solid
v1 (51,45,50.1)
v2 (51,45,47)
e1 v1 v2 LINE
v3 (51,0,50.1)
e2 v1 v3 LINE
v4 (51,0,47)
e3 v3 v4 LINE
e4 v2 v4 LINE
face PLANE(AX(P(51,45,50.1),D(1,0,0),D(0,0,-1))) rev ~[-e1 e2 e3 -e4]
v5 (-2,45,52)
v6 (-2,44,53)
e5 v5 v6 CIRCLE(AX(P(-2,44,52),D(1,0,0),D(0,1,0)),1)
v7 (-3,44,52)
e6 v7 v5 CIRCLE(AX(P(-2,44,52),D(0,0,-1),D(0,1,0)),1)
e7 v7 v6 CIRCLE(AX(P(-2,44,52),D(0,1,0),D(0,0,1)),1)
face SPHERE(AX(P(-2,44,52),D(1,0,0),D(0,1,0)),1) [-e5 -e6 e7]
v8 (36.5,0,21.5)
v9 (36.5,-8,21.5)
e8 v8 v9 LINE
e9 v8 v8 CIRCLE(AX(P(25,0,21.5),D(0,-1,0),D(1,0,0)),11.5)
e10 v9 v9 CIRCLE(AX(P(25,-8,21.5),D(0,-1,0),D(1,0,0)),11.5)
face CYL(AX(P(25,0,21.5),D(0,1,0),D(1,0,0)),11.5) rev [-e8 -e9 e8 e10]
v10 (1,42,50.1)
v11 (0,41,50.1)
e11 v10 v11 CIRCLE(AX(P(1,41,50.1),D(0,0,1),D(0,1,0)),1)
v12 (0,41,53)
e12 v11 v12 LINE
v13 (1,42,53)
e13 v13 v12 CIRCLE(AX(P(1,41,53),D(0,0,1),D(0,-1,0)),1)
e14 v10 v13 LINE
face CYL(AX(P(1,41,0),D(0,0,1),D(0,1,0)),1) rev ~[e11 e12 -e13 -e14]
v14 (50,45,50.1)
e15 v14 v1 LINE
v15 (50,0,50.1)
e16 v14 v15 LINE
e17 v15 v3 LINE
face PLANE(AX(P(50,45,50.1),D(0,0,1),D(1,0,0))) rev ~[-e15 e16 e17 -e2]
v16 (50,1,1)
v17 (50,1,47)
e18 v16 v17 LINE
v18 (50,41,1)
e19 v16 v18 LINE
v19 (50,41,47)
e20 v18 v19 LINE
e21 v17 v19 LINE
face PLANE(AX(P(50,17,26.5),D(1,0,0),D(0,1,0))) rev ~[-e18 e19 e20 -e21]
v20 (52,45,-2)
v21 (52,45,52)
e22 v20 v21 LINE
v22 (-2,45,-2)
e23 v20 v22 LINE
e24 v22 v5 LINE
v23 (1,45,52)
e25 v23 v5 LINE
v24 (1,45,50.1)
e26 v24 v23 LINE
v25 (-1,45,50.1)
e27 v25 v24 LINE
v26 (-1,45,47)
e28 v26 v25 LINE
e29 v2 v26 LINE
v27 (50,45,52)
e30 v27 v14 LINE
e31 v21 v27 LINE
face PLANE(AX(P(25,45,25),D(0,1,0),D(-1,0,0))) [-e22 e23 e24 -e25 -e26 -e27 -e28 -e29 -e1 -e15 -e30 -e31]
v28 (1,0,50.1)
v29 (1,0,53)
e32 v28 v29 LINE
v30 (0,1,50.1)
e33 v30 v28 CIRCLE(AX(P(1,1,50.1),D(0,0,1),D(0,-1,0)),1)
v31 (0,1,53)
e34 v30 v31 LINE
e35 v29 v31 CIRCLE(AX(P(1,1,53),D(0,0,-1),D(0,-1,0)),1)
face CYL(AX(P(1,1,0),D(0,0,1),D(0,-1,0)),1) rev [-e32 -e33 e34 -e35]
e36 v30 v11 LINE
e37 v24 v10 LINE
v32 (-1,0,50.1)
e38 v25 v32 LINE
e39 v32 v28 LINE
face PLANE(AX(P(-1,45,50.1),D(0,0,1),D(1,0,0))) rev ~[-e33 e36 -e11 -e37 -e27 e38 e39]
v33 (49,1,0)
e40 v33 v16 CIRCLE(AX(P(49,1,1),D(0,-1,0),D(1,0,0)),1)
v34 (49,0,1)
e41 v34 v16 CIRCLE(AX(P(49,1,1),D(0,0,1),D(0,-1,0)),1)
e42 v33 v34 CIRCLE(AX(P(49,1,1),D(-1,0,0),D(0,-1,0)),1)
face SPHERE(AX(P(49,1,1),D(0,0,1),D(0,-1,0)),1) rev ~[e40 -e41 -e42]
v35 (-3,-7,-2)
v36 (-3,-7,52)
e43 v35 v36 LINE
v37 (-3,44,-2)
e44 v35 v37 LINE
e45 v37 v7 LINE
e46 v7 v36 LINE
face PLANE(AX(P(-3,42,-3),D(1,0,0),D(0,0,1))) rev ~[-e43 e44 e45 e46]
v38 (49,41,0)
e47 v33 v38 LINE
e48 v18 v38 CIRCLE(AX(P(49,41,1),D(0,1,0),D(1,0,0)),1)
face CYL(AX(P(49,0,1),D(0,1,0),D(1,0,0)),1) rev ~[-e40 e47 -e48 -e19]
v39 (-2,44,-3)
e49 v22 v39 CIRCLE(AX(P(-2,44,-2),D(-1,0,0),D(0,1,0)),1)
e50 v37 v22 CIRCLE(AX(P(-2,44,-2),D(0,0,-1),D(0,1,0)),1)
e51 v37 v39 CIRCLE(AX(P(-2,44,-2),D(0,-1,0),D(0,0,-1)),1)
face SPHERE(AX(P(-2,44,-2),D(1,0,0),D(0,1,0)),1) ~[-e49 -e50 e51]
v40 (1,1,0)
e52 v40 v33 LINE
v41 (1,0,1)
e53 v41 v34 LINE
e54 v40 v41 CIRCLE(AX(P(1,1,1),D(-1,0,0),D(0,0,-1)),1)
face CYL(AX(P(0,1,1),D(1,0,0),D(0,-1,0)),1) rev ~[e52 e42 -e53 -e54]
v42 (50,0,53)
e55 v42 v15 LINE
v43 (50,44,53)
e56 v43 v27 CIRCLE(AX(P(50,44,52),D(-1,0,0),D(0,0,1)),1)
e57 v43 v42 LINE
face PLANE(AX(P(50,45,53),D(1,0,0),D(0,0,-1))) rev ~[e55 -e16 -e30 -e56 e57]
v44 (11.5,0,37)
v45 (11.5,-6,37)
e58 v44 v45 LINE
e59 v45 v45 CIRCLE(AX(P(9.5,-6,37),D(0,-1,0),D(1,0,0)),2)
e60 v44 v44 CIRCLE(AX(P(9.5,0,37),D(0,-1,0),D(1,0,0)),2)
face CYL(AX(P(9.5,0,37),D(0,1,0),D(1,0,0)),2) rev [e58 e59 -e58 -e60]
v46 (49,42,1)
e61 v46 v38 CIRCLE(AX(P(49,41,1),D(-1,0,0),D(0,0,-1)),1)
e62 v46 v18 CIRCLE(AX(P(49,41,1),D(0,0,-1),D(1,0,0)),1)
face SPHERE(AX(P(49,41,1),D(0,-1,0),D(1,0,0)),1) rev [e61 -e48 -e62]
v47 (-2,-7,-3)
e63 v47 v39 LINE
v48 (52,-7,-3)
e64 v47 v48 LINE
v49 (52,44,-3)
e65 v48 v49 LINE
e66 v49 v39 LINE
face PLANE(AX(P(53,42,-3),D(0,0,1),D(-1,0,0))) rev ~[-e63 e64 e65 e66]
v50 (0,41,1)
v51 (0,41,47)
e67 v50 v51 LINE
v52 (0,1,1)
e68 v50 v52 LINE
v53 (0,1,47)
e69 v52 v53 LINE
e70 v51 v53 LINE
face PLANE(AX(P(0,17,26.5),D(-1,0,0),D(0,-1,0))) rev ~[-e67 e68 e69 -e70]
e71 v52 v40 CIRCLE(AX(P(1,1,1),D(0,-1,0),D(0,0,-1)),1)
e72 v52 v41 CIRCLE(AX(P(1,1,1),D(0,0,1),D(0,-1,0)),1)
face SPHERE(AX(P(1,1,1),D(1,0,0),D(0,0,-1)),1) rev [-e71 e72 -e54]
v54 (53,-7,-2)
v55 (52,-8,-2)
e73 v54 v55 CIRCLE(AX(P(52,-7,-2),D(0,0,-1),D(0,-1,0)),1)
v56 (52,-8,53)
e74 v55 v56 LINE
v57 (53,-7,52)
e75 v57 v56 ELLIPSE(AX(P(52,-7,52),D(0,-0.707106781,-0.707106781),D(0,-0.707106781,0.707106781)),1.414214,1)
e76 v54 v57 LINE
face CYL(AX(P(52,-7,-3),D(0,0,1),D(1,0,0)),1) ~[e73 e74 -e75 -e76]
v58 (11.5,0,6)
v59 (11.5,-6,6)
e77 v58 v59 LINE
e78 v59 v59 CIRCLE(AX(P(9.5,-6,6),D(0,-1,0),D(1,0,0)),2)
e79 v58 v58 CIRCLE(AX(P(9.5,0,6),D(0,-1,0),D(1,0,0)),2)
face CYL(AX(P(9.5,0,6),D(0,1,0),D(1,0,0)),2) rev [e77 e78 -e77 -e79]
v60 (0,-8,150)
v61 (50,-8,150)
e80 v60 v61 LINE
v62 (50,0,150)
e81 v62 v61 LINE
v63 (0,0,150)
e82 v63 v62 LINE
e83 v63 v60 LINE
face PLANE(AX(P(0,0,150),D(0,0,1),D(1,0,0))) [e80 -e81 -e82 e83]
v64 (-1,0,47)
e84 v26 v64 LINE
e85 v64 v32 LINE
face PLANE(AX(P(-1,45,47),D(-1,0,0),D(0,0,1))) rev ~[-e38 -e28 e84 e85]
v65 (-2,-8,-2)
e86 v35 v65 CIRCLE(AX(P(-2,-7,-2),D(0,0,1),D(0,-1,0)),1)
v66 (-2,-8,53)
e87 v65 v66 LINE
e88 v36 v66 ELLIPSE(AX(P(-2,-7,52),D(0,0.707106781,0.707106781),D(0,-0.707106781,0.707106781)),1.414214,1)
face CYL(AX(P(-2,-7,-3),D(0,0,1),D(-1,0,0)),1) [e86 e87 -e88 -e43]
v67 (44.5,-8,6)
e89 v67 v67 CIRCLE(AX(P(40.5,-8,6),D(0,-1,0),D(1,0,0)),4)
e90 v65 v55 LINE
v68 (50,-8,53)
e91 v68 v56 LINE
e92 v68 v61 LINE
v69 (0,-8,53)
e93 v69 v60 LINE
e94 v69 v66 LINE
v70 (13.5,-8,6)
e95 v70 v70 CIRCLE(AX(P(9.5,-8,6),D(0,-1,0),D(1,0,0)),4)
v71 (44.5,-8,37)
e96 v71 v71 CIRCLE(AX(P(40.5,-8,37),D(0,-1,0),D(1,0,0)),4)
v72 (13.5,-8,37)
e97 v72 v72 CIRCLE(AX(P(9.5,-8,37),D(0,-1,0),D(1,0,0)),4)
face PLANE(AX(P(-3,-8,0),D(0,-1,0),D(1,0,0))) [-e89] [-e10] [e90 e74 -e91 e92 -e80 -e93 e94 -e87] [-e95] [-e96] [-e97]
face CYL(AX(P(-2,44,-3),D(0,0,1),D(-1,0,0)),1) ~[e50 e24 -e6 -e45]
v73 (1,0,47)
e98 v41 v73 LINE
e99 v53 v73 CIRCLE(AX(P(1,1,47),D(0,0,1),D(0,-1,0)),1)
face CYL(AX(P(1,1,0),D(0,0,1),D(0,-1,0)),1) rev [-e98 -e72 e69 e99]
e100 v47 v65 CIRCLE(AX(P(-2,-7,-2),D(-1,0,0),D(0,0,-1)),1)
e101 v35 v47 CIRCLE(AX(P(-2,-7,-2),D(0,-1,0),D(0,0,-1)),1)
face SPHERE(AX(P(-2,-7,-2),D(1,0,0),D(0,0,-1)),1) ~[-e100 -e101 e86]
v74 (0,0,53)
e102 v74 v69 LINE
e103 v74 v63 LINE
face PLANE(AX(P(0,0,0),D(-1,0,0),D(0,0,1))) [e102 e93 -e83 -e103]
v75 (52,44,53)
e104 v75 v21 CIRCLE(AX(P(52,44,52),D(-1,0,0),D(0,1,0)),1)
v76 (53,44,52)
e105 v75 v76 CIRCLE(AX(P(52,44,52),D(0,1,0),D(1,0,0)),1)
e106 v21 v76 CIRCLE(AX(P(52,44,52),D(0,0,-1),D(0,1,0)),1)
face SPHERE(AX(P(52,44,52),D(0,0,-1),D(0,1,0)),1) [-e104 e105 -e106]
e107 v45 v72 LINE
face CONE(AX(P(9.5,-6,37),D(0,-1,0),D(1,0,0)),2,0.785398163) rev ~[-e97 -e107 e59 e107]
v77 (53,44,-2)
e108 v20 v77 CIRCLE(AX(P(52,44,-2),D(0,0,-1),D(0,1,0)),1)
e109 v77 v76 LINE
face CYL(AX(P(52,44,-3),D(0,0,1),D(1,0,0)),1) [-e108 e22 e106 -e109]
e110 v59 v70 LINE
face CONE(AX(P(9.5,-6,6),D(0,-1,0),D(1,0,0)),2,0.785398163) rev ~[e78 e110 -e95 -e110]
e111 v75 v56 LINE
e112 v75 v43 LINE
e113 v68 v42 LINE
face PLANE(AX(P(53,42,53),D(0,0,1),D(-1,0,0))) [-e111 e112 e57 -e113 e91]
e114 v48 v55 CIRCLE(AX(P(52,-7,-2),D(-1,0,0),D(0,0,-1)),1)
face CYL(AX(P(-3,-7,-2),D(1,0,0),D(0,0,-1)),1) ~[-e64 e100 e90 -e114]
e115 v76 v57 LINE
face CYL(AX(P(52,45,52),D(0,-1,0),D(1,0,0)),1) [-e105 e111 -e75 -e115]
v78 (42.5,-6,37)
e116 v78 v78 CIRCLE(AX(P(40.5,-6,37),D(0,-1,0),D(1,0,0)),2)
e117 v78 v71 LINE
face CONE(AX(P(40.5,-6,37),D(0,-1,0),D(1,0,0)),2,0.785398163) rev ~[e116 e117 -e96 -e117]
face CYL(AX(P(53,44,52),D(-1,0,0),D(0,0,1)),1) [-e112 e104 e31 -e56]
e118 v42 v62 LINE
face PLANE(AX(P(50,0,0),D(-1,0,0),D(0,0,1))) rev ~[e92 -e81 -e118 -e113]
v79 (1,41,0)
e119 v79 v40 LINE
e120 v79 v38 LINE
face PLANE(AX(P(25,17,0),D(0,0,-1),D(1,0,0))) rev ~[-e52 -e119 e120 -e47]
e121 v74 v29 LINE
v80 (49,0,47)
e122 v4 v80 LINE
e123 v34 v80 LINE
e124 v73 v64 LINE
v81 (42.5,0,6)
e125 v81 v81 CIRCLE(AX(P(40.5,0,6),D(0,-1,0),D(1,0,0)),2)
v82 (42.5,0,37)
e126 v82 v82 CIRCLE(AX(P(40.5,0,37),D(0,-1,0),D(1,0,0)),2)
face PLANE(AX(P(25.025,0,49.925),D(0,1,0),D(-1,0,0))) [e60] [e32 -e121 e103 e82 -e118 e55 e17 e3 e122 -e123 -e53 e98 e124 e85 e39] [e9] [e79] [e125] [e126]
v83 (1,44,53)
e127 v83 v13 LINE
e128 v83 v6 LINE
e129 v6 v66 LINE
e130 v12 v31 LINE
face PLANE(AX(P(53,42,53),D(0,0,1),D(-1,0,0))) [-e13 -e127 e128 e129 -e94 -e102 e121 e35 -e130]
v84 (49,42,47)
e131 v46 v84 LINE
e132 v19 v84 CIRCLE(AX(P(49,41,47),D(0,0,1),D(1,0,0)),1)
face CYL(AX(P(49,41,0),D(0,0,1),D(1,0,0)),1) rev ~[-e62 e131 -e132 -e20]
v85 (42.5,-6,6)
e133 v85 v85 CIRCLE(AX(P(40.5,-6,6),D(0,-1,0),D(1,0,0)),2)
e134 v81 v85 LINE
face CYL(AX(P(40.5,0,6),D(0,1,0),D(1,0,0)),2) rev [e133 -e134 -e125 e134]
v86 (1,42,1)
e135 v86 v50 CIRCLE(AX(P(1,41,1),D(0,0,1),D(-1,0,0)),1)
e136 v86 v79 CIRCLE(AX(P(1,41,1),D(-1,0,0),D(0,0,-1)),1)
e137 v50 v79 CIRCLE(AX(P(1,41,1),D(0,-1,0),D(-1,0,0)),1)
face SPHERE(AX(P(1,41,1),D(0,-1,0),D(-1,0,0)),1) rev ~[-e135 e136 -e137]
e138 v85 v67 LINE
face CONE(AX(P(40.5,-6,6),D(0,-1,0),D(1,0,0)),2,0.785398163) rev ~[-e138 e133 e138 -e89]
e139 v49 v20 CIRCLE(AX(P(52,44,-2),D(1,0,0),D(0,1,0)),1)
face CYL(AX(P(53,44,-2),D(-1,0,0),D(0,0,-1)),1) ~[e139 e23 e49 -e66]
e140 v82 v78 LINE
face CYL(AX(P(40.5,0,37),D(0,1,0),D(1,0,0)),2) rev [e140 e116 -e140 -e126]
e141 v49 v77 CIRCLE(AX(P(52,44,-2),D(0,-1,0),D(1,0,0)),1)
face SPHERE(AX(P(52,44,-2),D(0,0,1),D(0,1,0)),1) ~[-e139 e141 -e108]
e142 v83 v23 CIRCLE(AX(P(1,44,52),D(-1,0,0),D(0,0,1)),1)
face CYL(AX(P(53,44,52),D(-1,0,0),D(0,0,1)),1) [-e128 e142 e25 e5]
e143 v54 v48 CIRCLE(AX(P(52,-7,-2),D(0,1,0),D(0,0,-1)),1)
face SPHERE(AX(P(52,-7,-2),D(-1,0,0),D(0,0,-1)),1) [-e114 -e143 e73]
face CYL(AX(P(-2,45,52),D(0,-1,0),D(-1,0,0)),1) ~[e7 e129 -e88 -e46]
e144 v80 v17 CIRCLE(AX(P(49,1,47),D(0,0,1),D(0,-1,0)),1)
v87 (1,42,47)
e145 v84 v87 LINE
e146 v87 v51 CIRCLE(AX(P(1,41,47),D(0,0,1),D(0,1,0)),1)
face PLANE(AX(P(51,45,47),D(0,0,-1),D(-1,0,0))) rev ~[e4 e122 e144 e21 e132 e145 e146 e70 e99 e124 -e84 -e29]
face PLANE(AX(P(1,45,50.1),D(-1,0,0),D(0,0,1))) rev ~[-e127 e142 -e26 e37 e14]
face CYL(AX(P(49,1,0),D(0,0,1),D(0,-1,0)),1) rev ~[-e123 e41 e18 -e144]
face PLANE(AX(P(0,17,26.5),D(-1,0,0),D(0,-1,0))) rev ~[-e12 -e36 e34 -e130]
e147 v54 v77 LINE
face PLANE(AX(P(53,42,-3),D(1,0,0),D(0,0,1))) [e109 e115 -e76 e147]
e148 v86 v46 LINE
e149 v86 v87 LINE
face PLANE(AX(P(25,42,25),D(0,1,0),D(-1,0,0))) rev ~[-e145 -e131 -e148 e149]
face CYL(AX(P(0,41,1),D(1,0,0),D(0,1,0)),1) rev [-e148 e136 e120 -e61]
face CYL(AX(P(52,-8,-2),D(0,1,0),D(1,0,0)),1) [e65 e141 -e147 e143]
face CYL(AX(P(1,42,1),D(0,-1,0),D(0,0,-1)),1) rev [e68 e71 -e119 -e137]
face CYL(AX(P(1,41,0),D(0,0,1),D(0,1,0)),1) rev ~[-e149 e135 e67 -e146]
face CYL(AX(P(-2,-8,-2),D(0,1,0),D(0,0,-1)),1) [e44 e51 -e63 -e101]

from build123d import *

# Parameters (mm, degrees)
F0_W      = 50
F0_H      = 150
F0_R      = 2
F0_R_2    = 11.5
F1_DEPTH  = 8
F2_SIZE   = 2
F3_W      = 50
F3_H      = 53
F4_DEPTH  = 3
F5_W      = 50
F5_H      = 53
F6_DEPTH  = 3
F7_W      = 56
F7_H      = 50
F8_DEPTH  = 3
F9_W      = 56
F9_H      = 56
F10_DEPTH = 3
F11_R     = 1
F13_DEPTH = 45


with BuildPart() as f1:
    # F0 (on Front) → F1 (new body)
    with BuildSketch(Plane.XZ):
        with Locations((25, 75)):
            Rectangle(F0_W, F0_H)
        with Locations((9.5, 6)):
            Circle(F0_R, mode=Mode.SUBTRACT)
        with Locations((9.5, 37)):
            Circle(F0_R, mode=Mode.SUBTRACT)
        with Locations((25, 21.5)):
            Circle(F0_R_2, mode=Mode.SUBTRACT)
        with Locations((40.5, 6)):
            Circle(F0_R, mode=Mode.SUBTRACT)
        with Locations((40.5, 37)):
            Circle(F0_R, mode=Mode.SUBTRACT)
    extrude(amount=F1_DEPTH)

    # F2
    f2_edges = [f1.edges().sort_by_distance(p)[0] for p in [
        (7.5, -8, 37),
        (38.5, -8, 37),
        (38.5, -8, 6),
        (7.5, -8, 6),
    ]]
    chamfer(f2_edges, length=F2_SIZE)

    # F3 (on face) → F4 (join)
    with BuildSketch(Plane.YZ.offset(50)):
        with Locations((17, 26.5)):
            Rectangle(F3_W, F3_H)
    extrude(amount=F4_DEPTH)

    # F5 (on face) → F6 (join)
    with BuildSketch(Plane(origin=(0, 0, 0), x_dir=(0, -1, 0), z_dir=(-1, 0, 0))):
        with Locations((-17, 26.5)):
            Rectangle(F5_W, F5_H)
    extrude(amount=F6_DEPTH)

    # F7 (on face) → F8 (join)
    with BuildSketch(Plane(origin=(0, 0, 0), x_dir=(1, 0, 0), z_dir=(0, 0, -1))):
        with Locations((25, -17)):
            Rectangle(F7_W, F7_H)
    extrude(amount=F8_DEPTH)

    # F9 (on face) → F10 (join)
    with BuildSketch(Plane(origin=(0, 42, 0), x_dir=(-1, 0, 0), z_dir=(0, 1, 0))):
        with Locations((-25, 25)):
            Rectangle(F9_W, F9_H)
    extrude(amount=F10_DEPTH)

    # F11
    f11_edges = [f1.edges().sort_by_distance(p)[0] for p in [
        (50, 0, 26.5),
        (25, 0, 0),
        (50, 21, 0),
        (0, 21, 0),
        (0, 42, 26.5),
        (50, 42, 26.5),
        (0, 0, 26.5),
        (25, 42, 0),
        (53, 45, 25),
        (25, 45, 53),
        (25, 45, -3),
        (-3, 45, 25),
        (25, -8, -3),
        (-3, 18.5, -3),
        (53, 18.5, -3),
        (53, -8, 25),
        (53, 18.5, 53),
        (-3, -8, 25),
        (-3, 18.5, 53),
    ]]
    fillet(f11_edges, radius=F11_R)

    # F12 (on face) → F13 (cut, through all)
    with BuildSketch(Plane(origin=(0, 45, 0), x_dir=(-1, 0, 0), z_dir=(0, 1, 0))):
        Polygon((-50, 50.1), (-51, 50.1), (-51, 47), (1, 47), (1, 50.1), (-1, 50.1), (-1, 53), (-50, 53), align=None)
    extrude(amount=-F13_DEPTH, mode=Mode.SUBTRACT)


solid = f1.part
